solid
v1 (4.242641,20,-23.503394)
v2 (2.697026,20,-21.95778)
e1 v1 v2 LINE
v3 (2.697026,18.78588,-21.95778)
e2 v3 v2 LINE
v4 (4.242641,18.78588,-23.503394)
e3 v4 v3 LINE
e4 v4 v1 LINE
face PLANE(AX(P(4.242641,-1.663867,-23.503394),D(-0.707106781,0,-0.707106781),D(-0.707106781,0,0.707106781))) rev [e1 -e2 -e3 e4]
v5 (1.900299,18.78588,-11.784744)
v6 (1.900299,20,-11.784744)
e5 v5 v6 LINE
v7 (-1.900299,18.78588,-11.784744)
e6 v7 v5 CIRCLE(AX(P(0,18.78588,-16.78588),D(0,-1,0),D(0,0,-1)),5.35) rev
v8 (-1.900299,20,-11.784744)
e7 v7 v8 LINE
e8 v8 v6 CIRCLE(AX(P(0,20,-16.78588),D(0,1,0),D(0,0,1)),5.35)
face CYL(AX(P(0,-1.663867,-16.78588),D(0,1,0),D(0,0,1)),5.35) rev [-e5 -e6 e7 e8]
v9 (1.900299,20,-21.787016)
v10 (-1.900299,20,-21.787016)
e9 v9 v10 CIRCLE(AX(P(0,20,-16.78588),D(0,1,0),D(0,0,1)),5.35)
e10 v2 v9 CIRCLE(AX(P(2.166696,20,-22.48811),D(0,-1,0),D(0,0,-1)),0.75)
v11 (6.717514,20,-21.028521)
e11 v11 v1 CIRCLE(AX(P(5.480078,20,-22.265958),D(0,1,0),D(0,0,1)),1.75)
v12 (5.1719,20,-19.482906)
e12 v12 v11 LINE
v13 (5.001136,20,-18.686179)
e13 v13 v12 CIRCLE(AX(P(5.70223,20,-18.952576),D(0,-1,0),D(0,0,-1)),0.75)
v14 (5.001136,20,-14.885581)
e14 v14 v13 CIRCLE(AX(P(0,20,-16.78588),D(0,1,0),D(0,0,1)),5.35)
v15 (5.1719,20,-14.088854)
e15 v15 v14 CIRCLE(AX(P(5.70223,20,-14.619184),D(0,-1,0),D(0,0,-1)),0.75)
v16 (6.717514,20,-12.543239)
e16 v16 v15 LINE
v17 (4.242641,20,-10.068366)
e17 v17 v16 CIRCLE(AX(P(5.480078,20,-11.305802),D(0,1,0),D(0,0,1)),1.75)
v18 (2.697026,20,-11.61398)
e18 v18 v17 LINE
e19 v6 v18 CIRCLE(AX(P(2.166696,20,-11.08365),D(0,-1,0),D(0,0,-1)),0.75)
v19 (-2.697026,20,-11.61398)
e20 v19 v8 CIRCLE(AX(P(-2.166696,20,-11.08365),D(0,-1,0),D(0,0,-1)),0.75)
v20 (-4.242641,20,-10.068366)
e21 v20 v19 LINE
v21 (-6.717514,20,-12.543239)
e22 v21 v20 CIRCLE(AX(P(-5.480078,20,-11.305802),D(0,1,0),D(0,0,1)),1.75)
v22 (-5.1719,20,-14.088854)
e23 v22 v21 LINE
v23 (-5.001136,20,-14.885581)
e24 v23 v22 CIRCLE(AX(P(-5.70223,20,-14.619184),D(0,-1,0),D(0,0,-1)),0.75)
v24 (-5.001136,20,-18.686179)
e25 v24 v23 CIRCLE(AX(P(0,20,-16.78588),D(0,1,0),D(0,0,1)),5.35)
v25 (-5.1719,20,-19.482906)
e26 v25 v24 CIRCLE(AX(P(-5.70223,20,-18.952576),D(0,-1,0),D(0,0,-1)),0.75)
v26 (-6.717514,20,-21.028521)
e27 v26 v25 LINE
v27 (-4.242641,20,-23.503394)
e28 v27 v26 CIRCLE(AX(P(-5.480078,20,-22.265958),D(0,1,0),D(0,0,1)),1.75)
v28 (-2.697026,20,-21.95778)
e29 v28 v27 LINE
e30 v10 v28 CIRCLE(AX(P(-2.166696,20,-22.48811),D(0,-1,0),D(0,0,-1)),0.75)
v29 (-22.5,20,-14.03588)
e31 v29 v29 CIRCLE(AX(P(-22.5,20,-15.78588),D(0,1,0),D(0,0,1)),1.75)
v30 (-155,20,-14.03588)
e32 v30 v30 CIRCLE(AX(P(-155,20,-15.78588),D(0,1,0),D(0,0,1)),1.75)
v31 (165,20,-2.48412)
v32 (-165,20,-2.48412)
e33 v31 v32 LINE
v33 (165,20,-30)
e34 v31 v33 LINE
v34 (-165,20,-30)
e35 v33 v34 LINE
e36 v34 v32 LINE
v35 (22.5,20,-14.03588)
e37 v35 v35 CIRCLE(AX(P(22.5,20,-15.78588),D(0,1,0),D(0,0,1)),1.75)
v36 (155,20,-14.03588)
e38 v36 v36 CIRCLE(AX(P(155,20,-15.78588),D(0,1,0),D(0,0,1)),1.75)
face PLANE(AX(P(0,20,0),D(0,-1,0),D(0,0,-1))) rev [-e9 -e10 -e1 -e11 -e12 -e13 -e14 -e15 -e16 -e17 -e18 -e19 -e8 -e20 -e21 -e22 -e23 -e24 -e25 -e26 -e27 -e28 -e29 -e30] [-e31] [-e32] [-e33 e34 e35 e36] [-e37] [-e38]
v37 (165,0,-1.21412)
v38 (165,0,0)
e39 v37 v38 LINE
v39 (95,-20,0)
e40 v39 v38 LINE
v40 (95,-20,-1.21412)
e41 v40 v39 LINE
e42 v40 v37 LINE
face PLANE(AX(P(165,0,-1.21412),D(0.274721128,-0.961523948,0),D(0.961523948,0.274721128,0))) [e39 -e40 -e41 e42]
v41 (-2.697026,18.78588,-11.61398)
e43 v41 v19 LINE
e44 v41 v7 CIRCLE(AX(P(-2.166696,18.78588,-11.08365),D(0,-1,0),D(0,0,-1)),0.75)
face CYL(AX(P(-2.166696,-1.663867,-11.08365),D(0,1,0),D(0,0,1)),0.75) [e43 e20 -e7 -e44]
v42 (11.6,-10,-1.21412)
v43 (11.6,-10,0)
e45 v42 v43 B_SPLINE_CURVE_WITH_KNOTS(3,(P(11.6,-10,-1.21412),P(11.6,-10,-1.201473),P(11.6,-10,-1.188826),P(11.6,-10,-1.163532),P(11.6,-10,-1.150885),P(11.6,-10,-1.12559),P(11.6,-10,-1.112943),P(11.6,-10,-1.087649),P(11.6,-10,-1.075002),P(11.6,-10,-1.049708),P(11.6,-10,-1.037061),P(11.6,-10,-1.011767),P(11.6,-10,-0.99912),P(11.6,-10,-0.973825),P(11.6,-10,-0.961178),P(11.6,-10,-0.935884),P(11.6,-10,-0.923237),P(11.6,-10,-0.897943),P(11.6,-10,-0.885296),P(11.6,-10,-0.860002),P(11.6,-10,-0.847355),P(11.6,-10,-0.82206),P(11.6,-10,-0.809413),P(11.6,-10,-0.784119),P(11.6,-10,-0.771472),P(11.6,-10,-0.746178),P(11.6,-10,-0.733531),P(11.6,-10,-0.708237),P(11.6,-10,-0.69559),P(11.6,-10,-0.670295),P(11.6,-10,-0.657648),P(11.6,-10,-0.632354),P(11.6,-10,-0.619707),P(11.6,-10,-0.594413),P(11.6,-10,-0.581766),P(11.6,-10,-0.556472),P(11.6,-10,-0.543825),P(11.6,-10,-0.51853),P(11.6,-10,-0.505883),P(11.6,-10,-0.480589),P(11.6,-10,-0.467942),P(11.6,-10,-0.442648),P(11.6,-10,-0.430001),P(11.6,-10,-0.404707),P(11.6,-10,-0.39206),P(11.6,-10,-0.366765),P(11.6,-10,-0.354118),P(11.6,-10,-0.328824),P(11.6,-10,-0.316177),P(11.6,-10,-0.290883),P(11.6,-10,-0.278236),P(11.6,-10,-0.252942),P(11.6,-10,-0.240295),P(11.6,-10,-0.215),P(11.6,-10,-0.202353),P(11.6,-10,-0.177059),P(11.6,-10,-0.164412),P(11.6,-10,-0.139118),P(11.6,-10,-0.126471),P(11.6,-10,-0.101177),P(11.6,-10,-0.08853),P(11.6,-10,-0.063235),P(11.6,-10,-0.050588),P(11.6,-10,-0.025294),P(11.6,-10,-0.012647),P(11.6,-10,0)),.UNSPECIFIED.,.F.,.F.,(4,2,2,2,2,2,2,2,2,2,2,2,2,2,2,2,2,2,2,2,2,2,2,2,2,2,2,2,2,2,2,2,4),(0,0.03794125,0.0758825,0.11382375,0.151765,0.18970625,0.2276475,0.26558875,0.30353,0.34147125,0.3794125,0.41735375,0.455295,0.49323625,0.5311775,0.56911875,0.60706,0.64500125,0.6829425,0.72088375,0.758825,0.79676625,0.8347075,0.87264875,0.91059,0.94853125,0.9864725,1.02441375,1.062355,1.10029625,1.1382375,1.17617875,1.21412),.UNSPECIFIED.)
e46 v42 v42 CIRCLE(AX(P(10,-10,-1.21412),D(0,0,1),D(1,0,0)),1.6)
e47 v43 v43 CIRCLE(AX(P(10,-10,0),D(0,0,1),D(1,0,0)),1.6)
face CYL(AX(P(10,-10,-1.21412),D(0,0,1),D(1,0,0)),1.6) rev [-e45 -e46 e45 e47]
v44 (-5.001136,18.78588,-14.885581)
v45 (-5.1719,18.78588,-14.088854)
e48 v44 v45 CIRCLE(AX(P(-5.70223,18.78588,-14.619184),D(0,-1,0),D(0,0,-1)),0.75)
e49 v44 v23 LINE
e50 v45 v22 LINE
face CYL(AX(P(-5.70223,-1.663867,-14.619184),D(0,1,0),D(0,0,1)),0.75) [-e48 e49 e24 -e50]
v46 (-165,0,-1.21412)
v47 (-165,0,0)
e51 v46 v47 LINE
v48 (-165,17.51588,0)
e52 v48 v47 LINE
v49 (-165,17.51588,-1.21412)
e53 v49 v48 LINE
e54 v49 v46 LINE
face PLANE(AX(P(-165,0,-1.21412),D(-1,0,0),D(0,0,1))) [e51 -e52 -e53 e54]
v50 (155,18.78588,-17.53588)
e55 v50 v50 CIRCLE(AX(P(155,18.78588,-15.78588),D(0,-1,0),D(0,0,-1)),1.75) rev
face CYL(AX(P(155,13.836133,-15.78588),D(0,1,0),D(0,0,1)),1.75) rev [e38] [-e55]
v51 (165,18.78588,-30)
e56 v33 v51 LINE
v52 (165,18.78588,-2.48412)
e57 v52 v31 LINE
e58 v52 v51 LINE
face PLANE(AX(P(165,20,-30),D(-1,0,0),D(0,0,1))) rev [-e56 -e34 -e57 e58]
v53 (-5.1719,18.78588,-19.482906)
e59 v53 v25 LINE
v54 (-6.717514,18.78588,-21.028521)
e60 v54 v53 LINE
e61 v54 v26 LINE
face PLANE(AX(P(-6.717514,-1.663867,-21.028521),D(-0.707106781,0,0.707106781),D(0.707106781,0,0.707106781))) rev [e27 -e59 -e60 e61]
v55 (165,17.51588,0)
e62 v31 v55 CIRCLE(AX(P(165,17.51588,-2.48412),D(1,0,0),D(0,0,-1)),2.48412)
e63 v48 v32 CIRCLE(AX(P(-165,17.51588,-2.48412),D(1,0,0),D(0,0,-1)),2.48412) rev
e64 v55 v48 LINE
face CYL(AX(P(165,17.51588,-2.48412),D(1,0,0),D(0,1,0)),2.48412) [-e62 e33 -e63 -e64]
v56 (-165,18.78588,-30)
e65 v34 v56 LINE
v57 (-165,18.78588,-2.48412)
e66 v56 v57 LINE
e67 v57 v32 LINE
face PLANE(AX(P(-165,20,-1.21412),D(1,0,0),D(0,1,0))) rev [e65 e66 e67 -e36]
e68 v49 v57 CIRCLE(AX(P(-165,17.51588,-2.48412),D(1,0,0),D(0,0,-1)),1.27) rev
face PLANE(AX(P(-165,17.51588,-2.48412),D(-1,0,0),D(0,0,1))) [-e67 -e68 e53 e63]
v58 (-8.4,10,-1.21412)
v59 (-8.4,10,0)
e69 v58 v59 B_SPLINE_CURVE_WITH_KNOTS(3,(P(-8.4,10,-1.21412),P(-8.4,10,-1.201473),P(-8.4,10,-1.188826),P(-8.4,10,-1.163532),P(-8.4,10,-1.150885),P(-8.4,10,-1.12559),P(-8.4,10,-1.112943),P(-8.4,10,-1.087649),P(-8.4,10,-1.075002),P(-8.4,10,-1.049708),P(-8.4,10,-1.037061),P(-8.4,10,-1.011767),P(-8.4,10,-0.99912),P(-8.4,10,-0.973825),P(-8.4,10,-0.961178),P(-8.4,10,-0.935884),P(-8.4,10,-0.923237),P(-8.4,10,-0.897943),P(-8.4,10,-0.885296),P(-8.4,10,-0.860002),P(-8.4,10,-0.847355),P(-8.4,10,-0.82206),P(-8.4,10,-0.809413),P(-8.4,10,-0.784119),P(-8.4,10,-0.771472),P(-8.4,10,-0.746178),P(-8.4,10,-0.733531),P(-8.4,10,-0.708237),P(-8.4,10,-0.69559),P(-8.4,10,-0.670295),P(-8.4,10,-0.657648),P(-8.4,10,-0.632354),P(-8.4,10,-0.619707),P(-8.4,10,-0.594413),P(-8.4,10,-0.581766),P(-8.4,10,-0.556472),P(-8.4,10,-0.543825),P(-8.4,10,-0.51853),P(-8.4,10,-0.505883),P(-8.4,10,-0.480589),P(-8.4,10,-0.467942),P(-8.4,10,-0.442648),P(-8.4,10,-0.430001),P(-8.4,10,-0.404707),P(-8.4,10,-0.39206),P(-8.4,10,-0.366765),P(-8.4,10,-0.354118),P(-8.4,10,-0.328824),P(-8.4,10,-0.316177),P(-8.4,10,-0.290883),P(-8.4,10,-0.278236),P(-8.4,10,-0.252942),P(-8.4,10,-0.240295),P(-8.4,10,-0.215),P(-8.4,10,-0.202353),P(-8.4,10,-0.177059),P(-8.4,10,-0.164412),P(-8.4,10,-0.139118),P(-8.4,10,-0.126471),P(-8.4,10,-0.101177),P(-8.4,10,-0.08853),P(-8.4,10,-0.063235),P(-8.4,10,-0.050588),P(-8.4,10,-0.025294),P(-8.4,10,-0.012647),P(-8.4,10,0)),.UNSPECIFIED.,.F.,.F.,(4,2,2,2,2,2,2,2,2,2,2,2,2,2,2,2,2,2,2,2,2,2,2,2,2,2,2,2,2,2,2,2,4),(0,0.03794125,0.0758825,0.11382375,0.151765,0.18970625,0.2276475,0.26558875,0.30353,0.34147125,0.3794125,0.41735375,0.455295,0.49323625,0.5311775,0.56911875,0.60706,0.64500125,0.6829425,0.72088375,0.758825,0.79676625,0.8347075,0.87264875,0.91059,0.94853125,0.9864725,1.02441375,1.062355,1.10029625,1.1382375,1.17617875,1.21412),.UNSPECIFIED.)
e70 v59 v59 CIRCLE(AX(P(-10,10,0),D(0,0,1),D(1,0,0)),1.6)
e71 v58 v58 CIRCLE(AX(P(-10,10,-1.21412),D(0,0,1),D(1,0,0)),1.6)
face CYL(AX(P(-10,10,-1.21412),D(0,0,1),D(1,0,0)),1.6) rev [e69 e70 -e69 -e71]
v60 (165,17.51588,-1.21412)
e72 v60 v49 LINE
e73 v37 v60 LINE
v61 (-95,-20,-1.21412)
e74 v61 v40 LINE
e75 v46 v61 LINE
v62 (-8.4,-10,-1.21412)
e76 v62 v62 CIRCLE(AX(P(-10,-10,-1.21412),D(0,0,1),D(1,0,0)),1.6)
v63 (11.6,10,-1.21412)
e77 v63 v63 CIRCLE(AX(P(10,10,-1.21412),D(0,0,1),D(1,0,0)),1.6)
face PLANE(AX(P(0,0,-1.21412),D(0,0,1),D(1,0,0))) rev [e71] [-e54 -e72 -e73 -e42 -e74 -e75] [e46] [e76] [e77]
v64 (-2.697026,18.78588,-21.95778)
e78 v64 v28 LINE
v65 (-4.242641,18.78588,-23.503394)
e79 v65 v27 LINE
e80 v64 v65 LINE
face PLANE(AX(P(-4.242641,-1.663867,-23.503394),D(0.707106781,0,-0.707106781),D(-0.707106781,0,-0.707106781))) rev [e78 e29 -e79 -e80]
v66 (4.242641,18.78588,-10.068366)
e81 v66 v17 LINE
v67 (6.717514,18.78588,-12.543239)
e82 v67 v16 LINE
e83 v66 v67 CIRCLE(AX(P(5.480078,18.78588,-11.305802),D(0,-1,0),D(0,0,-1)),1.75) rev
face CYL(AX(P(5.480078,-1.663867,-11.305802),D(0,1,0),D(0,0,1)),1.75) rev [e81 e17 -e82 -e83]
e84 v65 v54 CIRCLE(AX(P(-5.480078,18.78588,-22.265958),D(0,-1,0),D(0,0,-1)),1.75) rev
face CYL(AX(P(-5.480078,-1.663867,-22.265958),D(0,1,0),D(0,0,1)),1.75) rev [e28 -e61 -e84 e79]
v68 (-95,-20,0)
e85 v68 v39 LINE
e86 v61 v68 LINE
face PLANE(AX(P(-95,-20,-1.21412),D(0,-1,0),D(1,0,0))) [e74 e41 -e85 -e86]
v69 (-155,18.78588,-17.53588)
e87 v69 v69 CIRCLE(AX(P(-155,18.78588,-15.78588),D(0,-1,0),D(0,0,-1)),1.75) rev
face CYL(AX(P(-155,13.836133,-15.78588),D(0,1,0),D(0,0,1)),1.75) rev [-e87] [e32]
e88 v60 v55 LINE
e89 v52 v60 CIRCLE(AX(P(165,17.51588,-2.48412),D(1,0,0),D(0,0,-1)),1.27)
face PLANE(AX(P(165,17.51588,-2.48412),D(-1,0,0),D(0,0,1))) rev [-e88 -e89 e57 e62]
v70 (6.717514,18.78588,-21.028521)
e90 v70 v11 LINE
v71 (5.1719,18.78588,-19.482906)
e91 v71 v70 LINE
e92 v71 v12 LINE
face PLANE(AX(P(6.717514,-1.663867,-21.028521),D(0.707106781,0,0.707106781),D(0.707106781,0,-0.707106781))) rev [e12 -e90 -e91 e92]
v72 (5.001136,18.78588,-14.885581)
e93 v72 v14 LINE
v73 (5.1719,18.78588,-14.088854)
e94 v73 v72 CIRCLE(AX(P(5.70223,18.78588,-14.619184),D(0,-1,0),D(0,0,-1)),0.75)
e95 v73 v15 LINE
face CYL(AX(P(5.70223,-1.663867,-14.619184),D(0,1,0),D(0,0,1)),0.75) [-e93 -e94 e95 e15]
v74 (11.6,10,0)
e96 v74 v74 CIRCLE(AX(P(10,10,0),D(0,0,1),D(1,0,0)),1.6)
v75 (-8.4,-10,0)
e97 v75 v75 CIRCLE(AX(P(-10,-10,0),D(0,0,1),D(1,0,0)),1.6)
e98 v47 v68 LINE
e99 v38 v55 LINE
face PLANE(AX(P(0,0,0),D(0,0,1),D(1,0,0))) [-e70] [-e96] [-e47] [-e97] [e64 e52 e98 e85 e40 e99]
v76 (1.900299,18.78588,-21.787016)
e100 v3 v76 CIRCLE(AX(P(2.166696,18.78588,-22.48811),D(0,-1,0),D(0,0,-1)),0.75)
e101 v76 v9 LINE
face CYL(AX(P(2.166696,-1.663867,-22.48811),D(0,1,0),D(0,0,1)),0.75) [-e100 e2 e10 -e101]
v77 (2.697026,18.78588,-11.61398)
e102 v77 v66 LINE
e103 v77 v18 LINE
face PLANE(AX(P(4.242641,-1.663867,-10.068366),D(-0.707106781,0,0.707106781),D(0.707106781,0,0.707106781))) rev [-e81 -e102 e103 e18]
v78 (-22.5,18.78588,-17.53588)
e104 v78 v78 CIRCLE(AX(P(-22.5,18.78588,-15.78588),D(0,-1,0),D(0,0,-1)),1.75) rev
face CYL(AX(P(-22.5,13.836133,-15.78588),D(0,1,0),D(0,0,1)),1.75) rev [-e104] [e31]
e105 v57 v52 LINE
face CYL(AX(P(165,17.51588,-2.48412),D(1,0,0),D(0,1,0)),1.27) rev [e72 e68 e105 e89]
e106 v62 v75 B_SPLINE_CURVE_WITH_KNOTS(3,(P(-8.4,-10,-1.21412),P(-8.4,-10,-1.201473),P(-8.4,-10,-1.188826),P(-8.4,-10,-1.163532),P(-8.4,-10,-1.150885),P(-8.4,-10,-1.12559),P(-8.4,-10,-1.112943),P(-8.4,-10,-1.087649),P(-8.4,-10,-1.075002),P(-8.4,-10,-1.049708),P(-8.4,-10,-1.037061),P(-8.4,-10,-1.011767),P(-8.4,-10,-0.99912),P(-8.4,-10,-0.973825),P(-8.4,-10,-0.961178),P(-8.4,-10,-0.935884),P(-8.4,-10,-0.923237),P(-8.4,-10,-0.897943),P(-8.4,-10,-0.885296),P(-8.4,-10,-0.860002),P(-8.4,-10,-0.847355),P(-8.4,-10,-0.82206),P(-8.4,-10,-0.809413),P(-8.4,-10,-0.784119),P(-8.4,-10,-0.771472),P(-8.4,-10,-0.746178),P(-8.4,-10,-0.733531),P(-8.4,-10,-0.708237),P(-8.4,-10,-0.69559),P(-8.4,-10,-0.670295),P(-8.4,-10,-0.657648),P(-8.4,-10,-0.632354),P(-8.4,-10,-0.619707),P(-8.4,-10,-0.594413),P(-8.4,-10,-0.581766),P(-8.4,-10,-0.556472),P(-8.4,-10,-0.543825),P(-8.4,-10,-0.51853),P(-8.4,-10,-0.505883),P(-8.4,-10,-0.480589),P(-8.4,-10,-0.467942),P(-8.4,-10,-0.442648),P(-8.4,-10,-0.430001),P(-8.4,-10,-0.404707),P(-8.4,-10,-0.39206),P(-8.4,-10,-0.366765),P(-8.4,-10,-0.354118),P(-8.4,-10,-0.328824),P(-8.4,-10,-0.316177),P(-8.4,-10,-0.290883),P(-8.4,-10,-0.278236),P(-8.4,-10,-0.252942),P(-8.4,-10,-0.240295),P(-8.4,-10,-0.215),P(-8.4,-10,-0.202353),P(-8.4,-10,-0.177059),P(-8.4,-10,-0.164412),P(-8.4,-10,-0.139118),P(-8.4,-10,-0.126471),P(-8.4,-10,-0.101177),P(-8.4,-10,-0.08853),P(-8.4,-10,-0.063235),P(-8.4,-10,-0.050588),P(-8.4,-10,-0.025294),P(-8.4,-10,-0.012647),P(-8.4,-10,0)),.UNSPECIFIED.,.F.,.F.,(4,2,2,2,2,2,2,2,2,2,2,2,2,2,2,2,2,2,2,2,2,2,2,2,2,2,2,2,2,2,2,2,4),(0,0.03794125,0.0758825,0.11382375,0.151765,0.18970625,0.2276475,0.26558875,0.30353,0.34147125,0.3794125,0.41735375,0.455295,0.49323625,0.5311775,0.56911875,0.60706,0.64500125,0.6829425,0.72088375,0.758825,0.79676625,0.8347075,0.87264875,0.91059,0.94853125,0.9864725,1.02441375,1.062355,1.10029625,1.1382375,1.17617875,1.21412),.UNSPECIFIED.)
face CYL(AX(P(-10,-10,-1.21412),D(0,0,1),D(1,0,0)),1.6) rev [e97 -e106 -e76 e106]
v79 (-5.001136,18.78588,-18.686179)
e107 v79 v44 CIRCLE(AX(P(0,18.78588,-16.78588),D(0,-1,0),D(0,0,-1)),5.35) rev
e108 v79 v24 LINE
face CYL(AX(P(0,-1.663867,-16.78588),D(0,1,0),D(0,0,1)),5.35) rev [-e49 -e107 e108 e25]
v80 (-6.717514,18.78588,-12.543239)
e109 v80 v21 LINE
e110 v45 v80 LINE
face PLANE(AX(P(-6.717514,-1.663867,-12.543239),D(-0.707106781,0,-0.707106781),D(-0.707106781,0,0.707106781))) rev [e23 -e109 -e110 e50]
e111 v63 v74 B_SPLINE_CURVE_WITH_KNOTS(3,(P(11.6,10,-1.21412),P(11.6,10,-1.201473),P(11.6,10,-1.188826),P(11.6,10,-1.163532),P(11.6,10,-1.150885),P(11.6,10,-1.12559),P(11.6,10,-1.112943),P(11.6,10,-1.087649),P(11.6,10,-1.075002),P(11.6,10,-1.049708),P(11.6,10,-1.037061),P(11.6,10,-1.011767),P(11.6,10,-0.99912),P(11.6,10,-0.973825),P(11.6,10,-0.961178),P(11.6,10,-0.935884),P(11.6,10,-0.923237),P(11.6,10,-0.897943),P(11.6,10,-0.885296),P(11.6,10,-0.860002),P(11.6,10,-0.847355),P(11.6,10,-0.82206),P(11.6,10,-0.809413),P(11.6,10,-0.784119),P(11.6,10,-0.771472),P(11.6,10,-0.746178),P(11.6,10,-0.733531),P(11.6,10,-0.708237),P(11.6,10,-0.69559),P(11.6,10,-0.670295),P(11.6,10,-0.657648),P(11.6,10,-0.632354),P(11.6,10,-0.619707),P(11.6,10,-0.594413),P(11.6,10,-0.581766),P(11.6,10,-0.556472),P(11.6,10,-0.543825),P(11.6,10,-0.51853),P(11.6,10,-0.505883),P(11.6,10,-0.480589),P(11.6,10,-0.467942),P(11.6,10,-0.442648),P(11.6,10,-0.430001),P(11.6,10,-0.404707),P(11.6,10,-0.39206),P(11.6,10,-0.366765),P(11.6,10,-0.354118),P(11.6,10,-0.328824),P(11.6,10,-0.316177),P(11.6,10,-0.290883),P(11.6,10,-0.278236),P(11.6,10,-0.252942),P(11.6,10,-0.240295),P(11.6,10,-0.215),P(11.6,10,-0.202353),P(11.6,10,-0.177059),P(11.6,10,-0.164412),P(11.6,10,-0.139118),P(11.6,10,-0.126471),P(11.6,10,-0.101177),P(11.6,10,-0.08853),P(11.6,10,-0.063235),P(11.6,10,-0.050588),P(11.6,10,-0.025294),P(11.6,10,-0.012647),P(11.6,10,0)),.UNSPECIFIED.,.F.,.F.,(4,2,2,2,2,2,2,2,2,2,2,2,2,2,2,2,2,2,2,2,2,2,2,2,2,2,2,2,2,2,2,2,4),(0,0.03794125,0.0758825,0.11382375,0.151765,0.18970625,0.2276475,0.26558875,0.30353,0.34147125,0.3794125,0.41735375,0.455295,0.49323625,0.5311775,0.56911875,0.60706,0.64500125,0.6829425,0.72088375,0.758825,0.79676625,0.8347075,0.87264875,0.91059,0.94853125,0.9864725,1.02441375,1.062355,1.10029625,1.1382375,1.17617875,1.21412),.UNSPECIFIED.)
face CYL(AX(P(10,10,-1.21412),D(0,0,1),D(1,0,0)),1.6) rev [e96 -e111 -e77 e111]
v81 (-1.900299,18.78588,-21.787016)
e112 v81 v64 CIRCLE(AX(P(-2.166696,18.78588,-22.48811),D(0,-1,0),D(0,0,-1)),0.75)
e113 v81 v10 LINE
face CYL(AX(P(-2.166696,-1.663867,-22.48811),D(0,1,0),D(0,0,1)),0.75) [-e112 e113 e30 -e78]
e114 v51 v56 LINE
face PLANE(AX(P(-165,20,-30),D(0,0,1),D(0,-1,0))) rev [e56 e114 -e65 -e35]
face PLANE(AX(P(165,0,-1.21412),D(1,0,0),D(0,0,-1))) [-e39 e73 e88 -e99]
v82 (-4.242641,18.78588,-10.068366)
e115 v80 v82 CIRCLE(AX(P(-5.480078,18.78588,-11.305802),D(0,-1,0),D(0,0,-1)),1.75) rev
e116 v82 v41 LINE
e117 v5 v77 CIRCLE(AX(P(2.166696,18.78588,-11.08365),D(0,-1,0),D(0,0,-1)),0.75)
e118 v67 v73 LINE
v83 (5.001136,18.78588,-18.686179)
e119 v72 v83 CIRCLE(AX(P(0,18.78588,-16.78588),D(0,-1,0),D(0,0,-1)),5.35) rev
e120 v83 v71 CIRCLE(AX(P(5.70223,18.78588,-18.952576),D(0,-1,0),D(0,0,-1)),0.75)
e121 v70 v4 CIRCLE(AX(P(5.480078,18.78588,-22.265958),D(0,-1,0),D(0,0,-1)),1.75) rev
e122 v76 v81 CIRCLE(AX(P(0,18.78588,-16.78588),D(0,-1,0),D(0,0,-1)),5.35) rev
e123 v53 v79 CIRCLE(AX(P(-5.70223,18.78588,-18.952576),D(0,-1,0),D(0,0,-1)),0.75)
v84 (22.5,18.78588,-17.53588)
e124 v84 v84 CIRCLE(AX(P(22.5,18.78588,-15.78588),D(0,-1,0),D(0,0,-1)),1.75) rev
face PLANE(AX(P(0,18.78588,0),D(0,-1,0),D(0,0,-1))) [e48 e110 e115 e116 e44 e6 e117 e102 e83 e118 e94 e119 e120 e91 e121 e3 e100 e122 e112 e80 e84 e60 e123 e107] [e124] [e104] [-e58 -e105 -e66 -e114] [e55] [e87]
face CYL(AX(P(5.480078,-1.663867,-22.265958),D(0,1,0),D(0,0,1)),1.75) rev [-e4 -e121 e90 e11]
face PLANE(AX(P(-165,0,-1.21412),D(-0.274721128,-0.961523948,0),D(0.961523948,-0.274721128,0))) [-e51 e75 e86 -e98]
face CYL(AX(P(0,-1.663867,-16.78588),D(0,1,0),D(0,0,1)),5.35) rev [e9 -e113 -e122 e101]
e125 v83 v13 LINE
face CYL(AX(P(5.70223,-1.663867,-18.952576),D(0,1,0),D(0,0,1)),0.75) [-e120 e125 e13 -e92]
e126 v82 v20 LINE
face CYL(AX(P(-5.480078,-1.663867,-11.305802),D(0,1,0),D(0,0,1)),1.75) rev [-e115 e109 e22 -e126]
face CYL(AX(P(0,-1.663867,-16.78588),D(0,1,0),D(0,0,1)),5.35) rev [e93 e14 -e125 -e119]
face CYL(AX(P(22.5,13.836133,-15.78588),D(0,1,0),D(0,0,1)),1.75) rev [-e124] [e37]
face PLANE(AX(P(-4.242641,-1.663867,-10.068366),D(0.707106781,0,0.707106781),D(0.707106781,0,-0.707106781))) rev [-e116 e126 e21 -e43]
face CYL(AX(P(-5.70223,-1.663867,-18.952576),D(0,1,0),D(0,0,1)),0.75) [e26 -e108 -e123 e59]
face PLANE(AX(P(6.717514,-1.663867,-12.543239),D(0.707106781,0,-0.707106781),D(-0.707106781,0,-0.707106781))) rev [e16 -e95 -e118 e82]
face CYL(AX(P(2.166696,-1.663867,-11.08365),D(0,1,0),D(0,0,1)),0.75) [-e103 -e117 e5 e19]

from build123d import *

# Parameters (mm, degrees)
SKETCH2_R                    = 1.6
BASE_FLANGE1_DEPTH           = 1.21412
EDGE_FLANGE1_STRIP_W         = 7.39648
EDGE_FLANGE1_STRIP_H         = 1.21412
EDGE_FLANGE1_STRIP_CUT_DEPTH = 330
EDGE_FLANGE1_DEPTH           = 330
CUT_EXTRUDE1_DEPTH           = 1.21412
SKETCH11_R                   = 1.75
CUT_EXTRUDE2_DEPTH           = 1.21412


# Sheet-metal steps are written as plain solids
with BuildPart() as part:
    # Sketch2 → Base-Flange1 (new body)
    with BuildSketch(Plane.XY):
        Polygon((-165, 0), (-165, 20), (165, 20), (165, 0), (95, -20), (-95, -20), align=None)
        with Locations((-10, 10)):
            Circle(SKETCH2_R, mode=Mode.SUBTRACT)
        with Locations((10, 10)):
            Circle(SKETCH2_R, mode=Mode.SUBTRACT)
        with Locations((10, -10)):
            Circle(SKETCH2_R, mode=Mode.SUBTRACT)
        with Locations((-10, -10)):
            Circle(SKETCH2_R, mode=Mode.SUBTRACT)
    extrude(amount=-BASE_FLANGE1_DEPTH)

    # Edge-Flange1 strip (across the edge) → Edge-Flange1 strip cut (cut)
    with BuildSketch(Plane(origin=(-165, 20, -1.21412), x_dir=(0, -1, 0), z_dir=(1, 0, 0))):
        with Locations((-1.21412, -0.60706)):
            Rectangle(EDGE_FLANGE1_STRIP_W, EDGE_FLANGE1_STRIP_H)
    extrude(amount=EDGE_FLANGE1_STRIP_CUT_DEPTH, mode=Mode.SUBTRACT)

    # Edge-Flange1 section (across the edge) → Edge-Flange1 (add)
    with BuildSketch(Plane(origin=(-165, 20, -1.21412), x_dir=(0, -1, 0), z_dir=(1, 0, 0))):
        with BuildLine():
            Line((0, 1.27), (0, 28.78588))
            Line((0, 28.78588), (1.21412, 28.78588))
            Line((1.21412, 28.78588), (1.21412, 1.27))
            ThreePointArc((1.21412, 1.27), (1.586094388, 0.371974388), (2.48412, 0))
            Line((2.48412, 0), (2.48412, -1.21412))
            ThreePointArc((2.48412, -1.21412), (0.727581903, -0.486538097), (0, 1.27))
        make_face()
    extrude(amount=EDGE_FLANGE1_DEPTH)

    # Sketch10 → Cut-Extrude1 (cut)
    with BuildSketch(Plane(origin=(0, 20, 0), x_dir=(1, 0, 0), z_dir=(0, 1, 0))):
        with BuildLine():
            Line((6.717514421, 21.028520687), (5.171899982, 19.482906248))
            ThreePointArc((5.171899982, 19.482906248), (4.968885146, 19.109755124), (5.001136207, 18.686179093))
            ThreePointArc((5.001136207, 18.686179093), (5.35, 16.78588), (5.001136207, 14.885580908))
            ThreePointArc((5.001136207, 14.885580908), (4.968885146, 14.462004877), (5.171899982, 14.088853753))
            Line((5.171899982, 14.088853753), (6.717514421, 12.543239313))
            ThreePointArc((6.717514421, 12.543239313), (6.717514421, 10.068365579), (4.242640687, 10.068365579))
            Line((4.242640687, 10.068365579), (2.697026248, 11.613980018))
            ThreePointArc((2.697026248, 11.613980018), (2.323875124, 11.816994854), (1.900299093, 11.784743793))
            ThreePointArc((1.900299093, 11.784743793), (0, 11.43588), (-1.900299092, 11.784743793))
            ThreePointArc((-1.900299092, 11.784743793), (-2.323875123, 11.816994854), (-2.697026247, 11.613980018))
            Line((-2.697026247, 11.613980018), (-4.242640687, 10.068365579))
            ThreePointArc((-4.242640687, 10.068365579), (-6.717514421, 10.068365579), (-6.717514421, 12.543239313))
            Line((-6.717514421, 12.543239313), (-5.171899982, 14.088853753))
            ThreePointArc((-5.171899982, 14.088853753), (-4.968885146, 14.462004877), (-5.001136207, 14.885580908))
            ThreePointArc((-5.001136207, 14.885580908), (-5.35, 16.78588), (-5.001136207, 18.686179093))
            ThreePointArc((-5.001136207, 18.686179093), (-4.968885146, 19.109755124), (-5.171899982, 19.482906248))
            Line((-5.171899982, 19.482906248), (-6.717514421, 21.028520687))
            ThreePointArc((-6.717514421, 21.028520687), (-6.717514421, 23.503394421), (-4.242640687, 23.503394421))
            Line((-4.242640687, 23.503394421), (-2.697026247, 21.957779982))
            ThreePointArc((-2.697026247, 21.957779982), (-2.323875123, 21.754765146), (-1.900299092, 21.787016207))
            ThreePointArc((-1.900299092, 21.787016207), (0, 22.13588), (1.900299093, 21.787016207))
            ThreePointArc((1.900299093, 21.787016207), (2.323875124, 21.754765146), (2.697026248, 21.957779982))
            Line((2.697026248, 21.957779982), (4.242640687, 23.503394421))
            ThreePointArc((4.242640687, 23.503394421), (6.717514421, 23.503394421), (6.717514421, 21.028520687))
        make_face()
    extrude(amount=-CUT_EXTRUDE1_DEPTH, mode=Mode.SUBTRACT)

    # Sketch11 → Cut-Extrude2 (cut)
    with BuildSketch(Plane(origin=(0, 20, 0), x_dir=(1, 0, 0), z_dir=(0, 1, 0))):
        with Locations(Location((-155, 15.78588, 0), (0, 0, 270))):
            Circle(SKETCH11_R)
        with Locations(Location((-22.5, 15.78588, 0), (0, 0, 270))):
            Circle(SKETCH11_R)
        with Locations(Location((22.5, 15.78588, 0), (0, 0, 270))):
            Circle(SKETCH11_R)
        with Locations(Location((155, 15.78588, 0), (0, 0, 270))):
            Circle(SKETCH11_R)
    extrude(amount=-CUT_EXTRUDE2_DEPTH, mode=Mode.SUBTRACT)


solid = part.part
